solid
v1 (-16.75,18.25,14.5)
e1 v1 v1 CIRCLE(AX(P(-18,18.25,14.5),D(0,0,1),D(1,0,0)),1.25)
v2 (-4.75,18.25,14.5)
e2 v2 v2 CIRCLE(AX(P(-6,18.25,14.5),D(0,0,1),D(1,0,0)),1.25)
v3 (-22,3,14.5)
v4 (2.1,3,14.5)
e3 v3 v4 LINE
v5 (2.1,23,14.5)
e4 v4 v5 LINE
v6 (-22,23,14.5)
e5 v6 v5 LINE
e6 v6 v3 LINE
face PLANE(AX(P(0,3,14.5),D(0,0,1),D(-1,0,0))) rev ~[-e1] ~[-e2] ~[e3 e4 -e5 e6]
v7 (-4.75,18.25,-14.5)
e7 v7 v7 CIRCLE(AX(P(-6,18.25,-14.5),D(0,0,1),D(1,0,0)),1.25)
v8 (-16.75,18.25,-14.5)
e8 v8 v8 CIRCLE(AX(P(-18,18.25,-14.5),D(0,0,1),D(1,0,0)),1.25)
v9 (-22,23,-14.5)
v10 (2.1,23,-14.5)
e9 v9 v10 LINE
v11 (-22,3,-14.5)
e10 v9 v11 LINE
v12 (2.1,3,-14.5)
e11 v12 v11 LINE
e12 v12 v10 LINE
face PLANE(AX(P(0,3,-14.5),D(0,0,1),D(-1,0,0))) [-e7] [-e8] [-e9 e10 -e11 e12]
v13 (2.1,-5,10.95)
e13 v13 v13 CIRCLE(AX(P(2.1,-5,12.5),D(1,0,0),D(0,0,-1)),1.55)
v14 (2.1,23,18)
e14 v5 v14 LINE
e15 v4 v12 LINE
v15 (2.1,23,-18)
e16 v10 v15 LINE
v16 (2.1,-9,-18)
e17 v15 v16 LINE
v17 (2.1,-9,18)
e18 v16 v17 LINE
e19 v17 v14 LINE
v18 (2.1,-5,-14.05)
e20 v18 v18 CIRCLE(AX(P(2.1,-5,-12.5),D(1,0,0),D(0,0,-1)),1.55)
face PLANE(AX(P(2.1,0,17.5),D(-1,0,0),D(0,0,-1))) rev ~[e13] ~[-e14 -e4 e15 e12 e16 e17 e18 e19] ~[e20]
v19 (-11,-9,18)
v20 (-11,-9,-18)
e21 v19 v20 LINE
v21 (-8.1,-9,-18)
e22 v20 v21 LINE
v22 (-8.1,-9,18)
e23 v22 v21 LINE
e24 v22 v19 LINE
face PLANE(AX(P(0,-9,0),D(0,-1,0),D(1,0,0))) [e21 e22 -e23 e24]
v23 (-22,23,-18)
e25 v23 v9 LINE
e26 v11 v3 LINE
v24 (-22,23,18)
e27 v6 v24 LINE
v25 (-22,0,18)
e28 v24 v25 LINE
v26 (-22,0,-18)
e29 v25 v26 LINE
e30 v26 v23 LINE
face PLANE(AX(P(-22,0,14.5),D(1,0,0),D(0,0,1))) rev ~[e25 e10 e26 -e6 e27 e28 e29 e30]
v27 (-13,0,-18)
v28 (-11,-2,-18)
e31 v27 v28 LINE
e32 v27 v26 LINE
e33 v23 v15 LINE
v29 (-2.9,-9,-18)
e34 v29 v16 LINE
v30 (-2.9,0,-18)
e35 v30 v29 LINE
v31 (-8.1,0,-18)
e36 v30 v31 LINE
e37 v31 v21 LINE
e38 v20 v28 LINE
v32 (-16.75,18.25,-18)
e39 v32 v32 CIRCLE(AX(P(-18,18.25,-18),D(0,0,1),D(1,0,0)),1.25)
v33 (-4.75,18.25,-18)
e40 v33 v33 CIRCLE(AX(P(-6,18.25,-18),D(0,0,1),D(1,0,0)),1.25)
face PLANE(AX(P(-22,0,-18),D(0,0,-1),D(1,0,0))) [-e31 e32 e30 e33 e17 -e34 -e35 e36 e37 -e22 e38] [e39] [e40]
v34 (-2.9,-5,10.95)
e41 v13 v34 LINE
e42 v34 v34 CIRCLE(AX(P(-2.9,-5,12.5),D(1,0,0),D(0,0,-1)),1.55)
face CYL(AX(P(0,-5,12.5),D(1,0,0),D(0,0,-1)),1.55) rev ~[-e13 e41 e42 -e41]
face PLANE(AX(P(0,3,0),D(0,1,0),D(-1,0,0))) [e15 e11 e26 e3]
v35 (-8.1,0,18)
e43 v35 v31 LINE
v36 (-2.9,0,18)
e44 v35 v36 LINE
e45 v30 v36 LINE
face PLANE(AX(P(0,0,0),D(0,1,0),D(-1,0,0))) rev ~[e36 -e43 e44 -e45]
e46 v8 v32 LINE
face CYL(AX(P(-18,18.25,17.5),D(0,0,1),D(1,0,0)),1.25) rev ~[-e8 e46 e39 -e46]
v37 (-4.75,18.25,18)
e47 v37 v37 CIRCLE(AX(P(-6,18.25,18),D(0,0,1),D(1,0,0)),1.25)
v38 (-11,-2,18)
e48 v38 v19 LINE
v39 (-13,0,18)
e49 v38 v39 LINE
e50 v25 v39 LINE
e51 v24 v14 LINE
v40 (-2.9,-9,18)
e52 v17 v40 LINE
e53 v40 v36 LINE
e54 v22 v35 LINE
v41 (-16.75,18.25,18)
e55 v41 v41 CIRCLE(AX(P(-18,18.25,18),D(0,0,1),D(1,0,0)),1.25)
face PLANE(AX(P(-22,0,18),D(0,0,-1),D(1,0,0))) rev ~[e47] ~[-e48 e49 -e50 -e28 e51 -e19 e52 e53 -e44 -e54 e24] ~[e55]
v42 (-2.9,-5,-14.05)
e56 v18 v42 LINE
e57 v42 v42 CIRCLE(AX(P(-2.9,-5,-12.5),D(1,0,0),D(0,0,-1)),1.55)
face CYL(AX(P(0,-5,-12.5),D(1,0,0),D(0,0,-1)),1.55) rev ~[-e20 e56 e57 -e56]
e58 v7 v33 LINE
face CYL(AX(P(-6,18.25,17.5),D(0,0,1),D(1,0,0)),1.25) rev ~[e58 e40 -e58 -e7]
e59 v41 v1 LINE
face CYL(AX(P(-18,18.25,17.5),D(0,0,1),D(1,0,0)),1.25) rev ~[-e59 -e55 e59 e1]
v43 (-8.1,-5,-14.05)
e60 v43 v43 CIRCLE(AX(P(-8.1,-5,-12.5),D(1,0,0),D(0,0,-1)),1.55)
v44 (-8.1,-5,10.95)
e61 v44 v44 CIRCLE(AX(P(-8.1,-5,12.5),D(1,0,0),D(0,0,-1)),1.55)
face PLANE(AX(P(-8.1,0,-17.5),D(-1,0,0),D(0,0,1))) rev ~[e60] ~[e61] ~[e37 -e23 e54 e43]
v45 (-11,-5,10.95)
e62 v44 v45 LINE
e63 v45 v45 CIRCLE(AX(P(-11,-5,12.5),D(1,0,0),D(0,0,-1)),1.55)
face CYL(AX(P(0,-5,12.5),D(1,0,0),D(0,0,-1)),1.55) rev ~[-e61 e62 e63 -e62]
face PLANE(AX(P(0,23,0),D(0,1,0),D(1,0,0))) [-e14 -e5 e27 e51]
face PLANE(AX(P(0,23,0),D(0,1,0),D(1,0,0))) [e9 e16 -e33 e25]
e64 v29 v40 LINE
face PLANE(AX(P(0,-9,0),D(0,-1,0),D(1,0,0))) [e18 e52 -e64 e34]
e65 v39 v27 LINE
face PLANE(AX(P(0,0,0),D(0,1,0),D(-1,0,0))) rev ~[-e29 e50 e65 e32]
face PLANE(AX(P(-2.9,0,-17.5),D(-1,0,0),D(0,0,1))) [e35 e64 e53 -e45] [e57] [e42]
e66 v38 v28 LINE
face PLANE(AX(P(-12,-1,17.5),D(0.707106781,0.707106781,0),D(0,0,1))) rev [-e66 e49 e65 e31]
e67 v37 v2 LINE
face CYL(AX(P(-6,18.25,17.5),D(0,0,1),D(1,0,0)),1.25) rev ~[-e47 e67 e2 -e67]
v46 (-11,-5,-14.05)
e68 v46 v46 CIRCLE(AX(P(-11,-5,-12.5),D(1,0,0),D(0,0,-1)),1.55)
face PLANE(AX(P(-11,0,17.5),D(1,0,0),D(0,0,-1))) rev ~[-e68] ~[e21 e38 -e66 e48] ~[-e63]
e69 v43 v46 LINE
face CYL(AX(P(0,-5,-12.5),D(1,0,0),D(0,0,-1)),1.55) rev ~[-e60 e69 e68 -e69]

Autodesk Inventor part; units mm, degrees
ref_plane "YZ Plane" through (0, 0, 0) normal (1, 0, 0) x (0, 1, 0)
ref_plane "XZ Plane" through (0, 0, 0) normal (0, 1, 0) x (-1, 0, 0)
ref_plane "XY Plane" through (0, 0, 0) normal (0, 0, 1) x (1, 0, 0)
sketch "Sketch1" plane through (0, 0, 0) normal (0, 1, 0) x (-1, 0, 0)
  line L0 (0, 14.5) -> (22, 14.5)
  line L1 (22, 14.5) -> (22, -14.5)
  line L2 (22, -14.5) -> (0, -14.5)
  line L3 (0, -14.5) -> (0, 14.5)
  circle A0 centre (5, 8) radius 1.25
  circle A1 centre (5, -8) radius 1.25
  circle A2 centre (17, 8) radius 1.25
  circle A3 centre (17, -8) radius 1.25
  line L4 (0, 14.5) -> (22, 14.5)
  line L5 (22, 14.5) -> (22, 17.5)
  line L6 (22, 17.5) -> (0, 17.5)
  line L7 (0, 17.5) -> (0, 14.5)
  line L8 (0, -14.5) -> (22, -14.5)
  line L9 (22, -14.5) -> (22, -17.5)
  line L10 (22, -17.5) -> (0, -17.5)
  line L11 (0, -17.5) -> (0, -14.5)
  point P0 (0, 0)
  dimension "d0" = 29
  dimension "d1" = 14.5
  dimension "d3" = 2.5
  dimension "d4" = 2.5
  dimension "d5" = 16
  dimension "d6" = 8
  dimension "d7" = 5
  dimension "d8" = 5
  dimension "d9" = 2.5
  dimension "d10" = 2.5
  dimension "d11" = 12
  dimension "d12" = 12
  dimension "d13" = 5
  dimension "d24" = 3
  dimension "d25" = 3
extrude "Extrusion1" add sketch "Sketch1" along normal blind 3 contours L7 L6 L5 L0 | L0 L1 L2 L3 | L2 L9 L10 L11 | A0 | A1 | A2 | A3
sketch "Sketch2" plane through (0, 0, 0) normal (0, -1, 0) x (1, 0, 0)
  line L0 (-3, 17.5) -> (0, 17.5)
  line L1 (0, 17.5) -> (0, -17.5)
  line L2 (0, -17.5) -> (-3, -17.5)
  line L3 (-3, -17.5) -> (-3, 17.5)
  line L4 (-22, 17.5) -> (0, 17.5) projected
  line L5 (0, -17.5) -> (-22, -17.5) projected
  line L6 (-22, 17.5) -> (0, 17.5) projected
  line L7 (0, -17.5) -> (-22, -17.5) projected
  line L8 (-8, 17.5) -> (-11, 17.5)
  line L9 (-11, 17.5) -> (-11, -17.5)
  line L10 (-11, -17.5) -> (-8, -17.5)
  line L11 (-8, -17.5) -> (-8, 17.5)
  line L12 (0, 17.5) -> (0, -17.5) projected
  point P0 (0, 0)
  point P1 (-8, -17.5)
  dimension "d17" = 3
  dimension "d40" = 3
  dimension "d41" = 5
  dimension "d50" = 0
extrude "Extrusion2" add sketch "Sketch2" along normal blind 9 contours L0 L1 L2 L3 | L11 L5 L9 L4
sketch "Sketch5" plane through (0, 3, 0) normal (0, 1, 0) x (1, 0, 0)
  line L0 (-22, -17.5) -> (0, -17.5) projected
  line L1 (-22, -17.5) -> (0, -17.5)
  line L2 (0, -17.5) -> (0, -14.5)
  line L3 (0, -14.5) -> (-22, -14.5)
  line L4 (-22, -14.5) -> (-22, -17.5)
  line L5 (-22, 17.5) -> (0, 17.5)
  line L6 (0, 17.5) -> (0, 14.5)
  line L7 (0, 14.5) -> (-22, 14.5)
  line L8 (-22, 14.5) -> (-22, 17.5)
  line L9 (0, 17.5) -> (-22, 17.5) projected
  line L10 (0, -17.5) -> (0, 17.5) projected
  point P0 (0, 0)
  dimension "d26" = 3
  dimension "d27" = 3
extrude "Extrusion4" add sketch "Sketch5" along normal blind 20
sketch "Sketch6" plane through (0, 0, 17.5) normal (0, 0, 1) x (1, 0, 0)
  circle A0 centre (-18, 18.25) radius 1.25
  line L0 (-22, 0) -> (0, 0) construction
  circle A1 centre (-6, 18.25) radius 1.25
  line L1 (-22, 0) -> (-22, 23) projected
  line L2 (0, 0) -> (0, 23) projected
  line L3 (-22, 3) -> (0, 3) projected
  line L4 (0, 3) -> (-22, 3) projected
  dimension "d34" = 2.5
  dimension "d53" = 2.5
  dimension "d54" = 4
  dimension "d55" = 6
  dimension "d56" = 15.25
  dimension "d57" = 15.25
extrude "Extrusion5" cut sketch "Sketch6" against normal blind 50
sketch "Sketch8" plane through (0, -9, 17.5) normal (1, 0, 0) x (0, 0, -1)
  circle A0 centre (5, 4) radius 1.55
  circle A1 centre (30, 4) radius 1.55
  line L0 (35, 0) -> (0, 0) projected
  line L1 (35, 0) -> (0, 0) projected
  line L2 (35, 0) -> (35, 32) projected
  line L3 (0, 0) -> (0, 32) projected
  point P0 (17.5, 9)
  dimension "d42" = 3.1
  dimension "d43" = 3.1
  dimension "d46" = 4
  dimension "d47" = 4
  dimension "d65" = 5
  dimension "d66" = 5
extrude "Extrusion6" cut sketch "Sketch8" against normal blind 100
thicken "Thicken1" operation add thickness 0.1 both sides no extend neighbours yes toward (1, 0, 0) faces at (-3, -1.1836, -3.9835)
thicken "Thicken2" operation add thickness 0.1 both sides no extend neighbours yes toward (-1, 0, 0) faces at (-8, -1.1836, -3.9835)
chamfer "Chamfer1" distance 2 angle 45 1 edges at (-11, 0, 0)
thicken "Thicken3" operation add thickness 2.1 both sides no extend neighbours yes toward (1, 0, 0) faces at (0, 0.6759, -3.7799)
thicken "Thicken4" operation add thickness 0.5 both sides no extend neighbours yes toward (0, 0, 1) faces at (-12.3333, 11.4808, 17.5)
thicken "Thicken5" operation add thickness 0.5 both sides no extend neighbours yes toward (0, 0, -1) faces at (-12.3333, 11.4808, -17.5)
equation "\"d1\" = 0.5 * d0"
equation "\"d6\" = 0.5 * d5"
properties part number "Bar_motor_mount"
